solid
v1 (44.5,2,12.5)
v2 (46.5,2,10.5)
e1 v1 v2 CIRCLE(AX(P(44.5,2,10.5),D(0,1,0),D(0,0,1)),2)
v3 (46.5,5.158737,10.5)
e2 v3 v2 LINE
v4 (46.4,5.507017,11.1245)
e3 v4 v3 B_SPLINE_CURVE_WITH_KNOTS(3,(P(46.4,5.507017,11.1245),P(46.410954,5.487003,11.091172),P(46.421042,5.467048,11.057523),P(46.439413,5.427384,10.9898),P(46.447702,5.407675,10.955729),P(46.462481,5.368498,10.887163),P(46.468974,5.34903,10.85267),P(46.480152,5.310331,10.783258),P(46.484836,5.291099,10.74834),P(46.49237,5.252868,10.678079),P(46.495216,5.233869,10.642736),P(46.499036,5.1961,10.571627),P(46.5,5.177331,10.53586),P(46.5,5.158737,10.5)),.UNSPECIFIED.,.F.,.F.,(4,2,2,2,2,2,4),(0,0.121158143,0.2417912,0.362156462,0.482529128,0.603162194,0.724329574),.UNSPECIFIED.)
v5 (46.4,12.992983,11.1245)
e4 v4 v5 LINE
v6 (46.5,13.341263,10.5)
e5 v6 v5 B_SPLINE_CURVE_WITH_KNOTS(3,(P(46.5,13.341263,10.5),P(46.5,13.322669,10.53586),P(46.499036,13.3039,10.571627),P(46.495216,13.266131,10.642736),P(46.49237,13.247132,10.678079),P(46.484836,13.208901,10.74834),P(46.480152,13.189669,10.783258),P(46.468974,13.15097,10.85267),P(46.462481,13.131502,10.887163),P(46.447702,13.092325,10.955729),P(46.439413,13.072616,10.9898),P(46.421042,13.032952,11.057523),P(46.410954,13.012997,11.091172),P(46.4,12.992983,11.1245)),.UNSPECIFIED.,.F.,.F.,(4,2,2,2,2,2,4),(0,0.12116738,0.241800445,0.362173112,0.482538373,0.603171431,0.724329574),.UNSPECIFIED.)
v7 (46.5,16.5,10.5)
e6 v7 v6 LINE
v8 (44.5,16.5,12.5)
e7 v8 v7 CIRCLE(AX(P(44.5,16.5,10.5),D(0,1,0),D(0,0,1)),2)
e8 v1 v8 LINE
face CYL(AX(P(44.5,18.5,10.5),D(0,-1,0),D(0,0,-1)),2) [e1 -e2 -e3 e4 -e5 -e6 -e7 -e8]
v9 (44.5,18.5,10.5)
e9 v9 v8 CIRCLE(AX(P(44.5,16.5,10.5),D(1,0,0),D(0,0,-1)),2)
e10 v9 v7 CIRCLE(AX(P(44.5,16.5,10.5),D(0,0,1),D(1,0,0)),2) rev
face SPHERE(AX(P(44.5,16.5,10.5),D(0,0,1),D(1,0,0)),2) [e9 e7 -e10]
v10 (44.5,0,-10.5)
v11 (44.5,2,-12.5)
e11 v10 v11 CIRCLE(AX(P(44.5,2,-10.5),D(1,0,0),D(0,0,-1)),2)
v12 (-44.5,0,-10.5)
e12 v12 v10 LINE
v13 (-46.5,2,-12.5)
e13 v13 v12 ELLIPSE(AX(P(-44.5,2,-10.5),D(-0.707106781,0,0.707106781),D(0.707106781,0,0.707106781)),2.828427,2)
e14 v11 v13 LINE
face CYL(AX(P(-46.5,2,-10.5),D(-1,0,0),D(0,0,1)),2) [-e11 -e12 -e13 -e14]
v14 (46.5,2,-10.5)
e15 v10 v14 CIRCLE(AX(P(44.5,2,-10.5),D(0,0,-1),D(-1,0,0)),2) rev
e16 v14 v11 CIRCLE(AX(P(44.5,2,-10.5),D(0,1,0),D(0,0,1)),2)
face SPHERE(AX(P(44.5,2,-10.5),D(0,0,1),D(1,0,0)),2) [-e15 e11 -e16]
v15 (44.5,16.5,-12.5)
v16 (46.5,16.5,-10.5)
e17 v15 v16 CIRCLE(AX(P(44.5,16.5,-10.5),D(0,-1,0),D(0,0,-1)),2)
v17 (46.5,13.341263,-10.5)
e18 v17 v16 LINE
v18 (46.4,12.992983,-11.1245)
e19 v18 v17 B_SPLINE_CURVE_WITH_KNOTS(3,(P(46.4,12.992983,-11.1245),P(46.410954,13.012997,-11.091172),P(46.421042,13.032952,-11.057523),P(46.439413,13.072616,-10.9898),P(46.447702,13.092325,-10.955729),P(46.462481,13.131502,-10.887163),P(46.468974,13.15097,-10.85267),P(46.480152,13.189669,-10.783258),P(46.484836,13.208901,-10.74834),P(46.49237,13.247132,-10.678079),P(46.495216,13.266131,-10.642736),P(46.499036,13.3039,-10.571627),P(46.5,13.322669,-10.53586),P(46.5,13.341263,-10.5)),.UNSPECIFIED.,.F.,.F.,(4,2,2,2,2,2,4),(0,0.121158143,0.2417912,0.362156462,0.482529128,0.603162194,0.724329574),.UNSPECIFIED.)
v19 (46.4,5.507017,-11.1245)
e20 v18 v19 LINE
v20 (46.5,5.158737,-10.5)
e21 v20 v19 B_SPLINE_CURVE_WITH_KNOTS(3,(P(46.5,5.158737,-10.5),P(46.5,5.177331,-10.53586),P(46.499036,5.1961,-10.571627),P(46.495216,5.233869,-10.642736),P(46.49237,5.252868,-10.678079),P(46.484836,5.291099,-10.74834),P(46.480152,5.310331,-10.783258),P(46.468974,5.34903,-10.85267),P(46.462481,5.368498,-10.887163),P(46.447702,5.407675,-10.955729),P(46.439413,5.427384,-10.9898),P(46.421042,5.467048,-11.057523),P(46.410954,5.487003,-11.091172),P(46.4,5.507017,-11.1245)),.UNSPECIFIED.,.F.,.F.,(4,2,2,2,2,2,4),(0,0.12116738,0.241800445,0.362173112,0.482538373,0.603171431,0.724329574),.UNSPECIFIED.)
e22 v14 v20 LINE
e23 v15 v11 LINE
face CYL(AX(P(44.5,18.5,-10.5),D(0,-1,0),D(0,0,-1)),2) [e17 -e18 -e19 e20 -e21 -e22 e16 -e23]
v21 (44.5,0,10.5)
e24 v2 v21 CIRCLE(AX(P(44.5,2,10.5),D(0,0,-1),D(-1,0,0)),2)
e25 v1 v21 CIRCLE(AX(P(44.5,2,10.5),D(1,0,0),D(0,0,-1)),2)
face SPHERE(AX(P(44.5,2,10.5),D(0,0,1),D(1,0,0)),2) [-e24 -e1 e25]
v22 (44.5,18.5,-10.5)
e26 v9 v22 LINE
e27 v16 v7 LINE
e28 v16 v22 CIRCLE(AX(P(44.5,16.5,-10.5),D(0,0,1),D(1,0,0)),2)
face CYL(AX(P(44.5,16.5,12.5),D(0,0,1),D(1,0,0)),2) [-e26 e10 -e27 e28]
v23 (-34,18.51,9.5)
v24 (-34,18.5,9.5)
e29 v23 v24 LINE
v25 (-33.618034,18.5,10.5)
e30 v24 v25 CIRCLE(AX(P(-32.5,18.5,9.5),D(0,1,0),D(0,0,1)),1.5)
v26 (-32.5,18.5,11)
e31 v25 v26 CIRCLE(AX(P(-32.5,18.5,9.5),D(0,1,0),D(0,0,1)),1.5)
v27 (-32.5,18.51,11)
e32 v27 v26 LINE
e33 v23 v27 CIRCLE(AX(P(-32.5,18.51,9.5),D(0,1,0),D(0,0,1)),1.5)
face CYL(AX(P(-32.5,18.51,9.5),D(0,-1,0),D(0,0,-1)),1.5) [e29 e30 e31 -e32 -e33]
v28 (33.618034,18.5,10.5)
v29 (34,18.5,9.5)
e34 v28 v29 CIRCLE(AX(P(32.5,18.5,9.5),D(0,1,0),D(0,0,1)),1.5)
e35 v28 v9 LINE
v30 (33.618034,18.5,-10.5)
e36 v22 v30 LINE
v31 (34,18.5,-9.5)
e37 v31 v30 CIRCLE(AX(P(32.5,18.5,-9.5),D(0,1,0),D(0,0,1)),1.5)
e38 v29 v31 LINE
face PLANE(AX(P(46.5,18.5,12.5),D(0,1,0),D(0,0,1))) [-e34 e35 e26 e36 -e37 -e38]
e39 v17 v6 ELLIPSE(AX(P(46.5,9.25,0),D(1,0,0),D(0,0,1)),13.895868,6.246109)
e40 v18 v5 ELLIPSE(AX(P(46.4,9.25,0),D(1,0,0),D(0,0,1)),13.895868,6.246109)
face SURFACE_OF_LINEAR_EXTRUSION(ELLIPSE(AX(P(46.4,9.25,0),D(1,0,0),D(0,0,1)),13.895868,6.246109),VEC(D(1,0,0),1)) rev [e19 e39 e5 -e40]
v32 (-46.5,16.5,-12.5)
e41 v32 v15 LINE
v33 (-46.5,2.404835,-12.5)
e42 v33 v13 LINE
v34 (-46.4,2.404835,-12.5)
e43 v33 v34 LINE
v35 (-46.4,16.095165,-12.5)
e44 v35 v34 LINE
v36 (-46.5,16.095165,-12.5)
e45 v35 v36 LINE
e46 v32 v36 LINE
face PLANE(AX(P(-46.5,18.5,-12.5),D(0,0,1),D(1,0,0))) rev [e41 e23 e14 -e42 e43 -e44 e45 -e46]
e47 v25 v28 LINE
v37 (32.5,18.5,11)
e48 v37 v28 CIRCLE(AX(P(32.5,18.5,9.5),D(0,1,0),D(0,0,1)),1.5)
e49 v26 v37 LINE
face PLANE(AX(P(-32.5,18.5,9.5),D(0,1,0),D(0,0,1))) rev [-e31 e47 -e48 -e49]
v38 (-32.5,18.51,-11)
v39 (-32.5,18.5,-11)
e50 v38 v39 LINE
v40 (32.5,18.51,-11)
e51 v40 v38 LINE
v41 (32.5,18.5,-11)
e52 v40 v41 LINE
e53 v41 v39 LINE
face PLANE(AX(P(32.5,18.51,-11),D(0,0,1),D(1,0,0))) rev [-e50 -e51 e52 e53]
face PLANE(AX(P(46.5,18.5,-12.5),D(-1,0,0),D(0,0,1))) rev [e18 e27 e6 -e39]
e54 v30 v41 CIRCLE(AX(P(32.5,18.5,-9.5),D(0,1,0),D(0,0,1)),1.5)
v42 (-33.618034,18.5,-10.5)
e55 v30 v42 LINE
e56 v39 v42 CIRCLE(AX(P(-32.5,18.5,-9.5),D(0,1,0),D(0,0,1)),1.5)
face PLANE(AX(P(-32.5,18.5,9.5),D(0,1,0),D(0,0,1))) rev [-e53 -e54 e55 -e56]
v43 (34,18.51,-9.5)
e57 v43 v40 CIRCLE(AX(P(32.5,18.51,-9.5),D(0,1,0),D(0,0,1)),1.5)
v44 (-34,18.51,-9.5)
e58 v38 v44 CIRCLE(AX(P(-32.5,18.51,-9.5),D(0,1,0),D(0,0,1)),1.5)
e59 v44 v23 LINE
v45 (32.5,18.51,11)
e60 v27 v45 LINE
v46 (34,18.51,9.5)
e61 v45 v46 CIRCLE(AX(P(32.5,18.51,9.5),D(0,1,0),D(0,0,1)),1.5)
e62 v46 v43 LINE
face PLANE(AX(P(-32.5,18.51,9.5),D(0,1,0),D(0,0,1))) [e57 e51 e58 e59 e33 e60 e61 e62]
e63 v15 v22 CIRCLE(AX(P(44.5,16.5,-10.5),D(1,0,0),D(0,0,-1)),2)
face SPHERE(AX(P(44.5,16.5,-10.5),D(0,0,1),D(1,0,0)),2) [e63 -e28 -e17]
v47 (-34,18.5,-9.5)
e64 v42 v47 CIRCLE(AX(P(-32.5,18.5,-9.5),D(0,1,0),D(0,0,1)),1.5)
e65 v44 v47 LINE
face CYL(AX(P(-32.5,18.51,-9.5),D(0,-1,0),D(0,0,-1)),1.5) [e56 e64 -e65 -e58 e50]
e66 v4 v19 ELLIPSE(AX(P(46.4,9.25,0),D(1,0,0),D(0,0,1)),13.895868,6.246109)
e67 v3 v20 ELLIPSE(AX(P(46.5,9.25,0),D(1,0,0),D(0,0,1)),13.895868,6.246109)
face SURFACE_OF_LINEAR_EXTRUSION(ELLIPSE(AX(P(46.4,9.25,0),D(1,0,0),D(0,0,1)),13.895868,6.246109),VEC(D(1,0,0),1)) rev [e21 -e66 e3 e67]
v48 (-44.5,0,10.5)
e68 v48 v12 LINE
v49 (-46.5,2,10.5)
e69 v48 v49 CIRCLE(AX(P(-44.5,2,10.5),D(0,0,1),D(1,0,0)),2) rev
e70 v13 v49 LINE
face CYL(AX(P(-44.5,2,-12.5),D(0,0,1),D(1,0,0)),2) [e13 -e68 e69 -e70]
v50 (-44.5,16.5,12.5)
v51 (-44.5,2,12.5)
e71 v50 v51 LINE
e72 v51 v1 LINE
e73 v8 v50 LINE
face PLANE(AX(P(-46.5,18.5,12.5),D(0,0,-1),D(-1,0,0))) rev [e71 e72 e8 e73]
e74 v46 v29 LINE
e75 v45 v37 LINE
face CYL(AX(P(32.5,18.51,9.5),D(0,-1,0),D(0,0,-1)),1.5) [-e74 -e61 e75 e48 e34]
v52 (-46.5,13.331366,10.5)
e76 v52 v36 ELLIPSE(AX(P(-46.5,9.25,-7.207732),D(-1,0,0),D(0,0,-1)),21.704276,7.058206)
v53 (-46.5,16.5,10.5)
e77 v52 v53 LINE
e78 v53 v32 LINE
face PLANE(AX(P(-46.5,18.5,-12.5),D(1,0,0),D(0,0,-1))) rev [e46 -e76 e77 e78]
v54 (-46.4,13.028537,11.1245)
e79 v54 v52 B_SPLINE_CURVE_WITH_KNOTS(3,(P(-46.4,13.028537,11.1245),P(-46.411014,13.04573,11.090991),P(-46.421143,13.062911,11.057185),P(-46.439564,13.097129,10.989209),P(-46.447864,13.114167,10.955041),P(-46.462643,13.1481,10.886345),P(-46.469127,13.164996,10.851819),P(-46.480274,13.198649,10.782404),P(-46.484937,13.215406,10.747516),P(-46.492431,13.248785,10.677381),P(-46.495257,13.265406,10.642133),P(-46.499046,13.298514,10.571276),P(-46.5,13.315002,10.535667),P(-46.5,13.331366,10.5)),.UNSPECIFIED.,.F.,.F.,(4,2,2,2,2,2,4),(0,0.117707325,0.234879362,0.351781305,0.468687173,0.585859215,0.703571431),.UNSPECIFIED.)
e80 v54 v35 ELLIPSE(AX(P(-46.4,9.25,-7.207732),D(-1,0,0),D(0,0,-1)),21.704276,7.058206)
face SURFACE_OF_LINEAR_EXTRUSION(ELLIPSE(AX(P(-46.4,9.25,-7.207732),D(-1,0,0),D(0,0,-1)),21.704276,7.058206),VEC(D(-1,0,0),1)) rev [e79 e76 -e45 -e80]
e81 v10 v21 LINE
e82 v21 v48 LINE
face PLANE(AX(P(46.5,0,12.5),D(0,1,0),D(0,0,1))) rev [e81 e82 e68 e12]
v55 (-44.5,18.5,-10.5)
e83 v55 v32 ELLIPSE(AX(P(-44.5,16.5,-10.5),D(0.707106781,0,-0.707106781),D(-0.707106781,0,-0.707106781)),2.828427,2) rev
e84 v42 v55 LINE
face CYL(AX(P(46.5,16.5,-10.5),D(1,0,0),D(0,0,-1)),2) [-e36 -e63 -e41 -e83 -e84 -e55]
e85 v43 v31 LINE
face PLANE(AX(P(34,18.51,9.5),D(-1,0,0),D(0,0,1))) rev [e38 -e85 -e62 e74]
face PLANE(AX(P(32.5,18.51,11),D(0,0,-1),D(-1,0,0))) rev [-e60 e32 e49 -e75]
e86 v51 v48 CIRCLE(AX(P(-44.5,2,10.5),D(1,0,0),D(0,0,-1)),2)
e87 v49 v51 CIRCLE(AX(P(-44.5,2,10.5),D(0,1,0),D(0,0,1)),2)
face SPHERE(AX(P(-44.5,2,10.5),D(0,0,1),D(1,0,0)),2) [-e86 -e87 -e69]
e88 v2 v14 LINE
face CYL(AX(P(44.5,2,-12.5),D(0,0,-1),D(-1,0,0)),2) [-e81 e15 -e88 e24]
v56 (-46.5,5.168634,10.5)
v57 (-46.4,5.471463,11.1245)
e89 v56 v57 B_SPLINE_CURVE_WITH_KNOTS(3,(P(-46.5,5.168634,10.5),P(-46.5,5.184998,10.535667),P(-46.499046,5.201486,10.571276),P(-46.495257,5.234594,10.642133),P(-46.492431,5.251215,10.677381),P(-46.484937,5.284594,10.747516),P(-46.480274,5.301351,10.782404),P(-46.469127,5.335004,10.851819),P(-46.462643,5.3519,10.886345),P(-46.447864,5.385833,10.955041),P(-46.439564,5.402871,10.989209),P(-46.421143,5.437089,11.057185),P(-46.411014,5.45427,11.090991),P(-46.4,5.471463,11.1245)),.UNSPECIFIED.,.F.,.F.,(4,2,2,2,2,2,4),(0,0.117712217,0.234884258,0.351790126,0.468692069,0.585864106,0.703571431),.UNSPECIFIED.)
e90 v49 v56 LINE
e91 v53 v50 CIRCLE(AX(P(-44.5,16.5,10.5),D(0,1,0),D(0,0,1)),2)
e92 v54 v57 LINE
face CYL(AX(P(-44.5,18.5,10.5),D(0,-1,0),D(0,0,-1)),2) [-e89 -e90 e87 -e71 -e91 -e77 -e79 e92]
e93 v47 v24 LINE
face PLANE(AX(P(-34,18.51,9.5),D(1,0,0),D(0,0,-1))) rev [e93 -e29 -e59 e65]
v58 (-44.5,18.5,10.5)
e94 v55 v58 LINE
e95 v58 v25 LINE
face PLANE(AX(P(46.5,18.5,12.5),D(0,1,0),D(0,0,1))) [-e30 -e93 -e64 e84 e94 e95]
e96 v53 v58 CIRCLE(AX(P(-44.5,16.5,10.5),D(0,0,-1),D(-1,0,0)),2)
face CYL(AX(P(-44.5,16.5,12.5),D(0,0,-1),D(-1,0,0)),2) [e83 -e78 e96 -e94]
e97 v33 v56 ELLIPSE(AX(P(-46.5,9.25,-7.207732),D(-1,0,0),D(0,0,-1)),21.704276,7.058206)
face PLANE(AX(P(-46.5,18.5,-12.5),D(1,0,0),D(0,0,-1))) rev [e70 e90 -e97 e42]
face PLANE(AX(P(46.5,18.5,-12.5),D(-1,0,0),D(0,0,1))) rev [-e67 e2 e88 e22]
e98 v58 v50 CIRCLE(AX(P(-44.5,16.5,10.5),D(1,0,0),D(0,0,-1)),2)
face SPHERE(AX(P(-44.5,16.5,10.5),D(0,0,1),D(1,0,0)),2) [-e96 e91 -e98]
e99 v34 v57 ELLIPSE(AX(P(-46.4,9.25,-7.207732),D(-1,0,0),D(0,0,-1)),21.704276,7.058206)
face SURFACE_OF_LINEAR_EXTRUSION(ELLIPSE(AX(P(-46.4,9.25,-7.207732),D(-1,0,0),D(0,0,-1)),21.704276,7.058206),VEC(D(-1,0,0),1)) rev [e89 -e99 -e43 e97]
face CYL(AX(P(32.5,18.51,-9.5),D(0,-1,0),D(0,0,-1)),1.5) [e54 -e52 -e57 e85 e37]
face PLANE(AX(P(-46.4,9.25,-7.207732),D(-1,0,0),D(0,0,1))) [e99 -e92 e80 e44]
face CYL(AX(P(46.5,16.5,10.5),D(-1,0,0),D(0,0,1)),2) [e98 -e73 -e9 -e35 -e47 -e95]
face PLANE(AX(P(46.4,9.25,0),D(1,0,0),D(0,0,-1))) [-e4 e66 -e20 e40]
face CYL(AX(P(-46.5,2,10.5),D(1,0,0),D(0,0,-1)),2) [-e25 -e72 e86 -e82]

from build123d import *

# Parameters (mm, degrees)
SKETCH1_W           = 93
SKETCH1_H           = 25
BOSS_EXTRUDE1_DEPTH = 18.5
FILLET1_R           = 2
FILLET2_R           = 2
BOSS_EXTRUDE2_DEPTH = 0.01
SKETCH4_RX          = 13.895867653
SKETCH4_RY          = 6.24610939
CUT_EXTRUDE1_DEPTH  = 0.1
SKETCH5_RX          = 21.704276093
SKETCH5_RY          = 7.058205551
CUT_EXTRUDE2_DEPTH  = 0.1


with BuildPart() as part:
    # Sketch1 → Boss-Extrude1 (new body)
    with BuildSketch(Plane(origin=(0, 0, 0), x_dir=(1, 0, 0), z_dir=(0, 1, 0))):
        Rectangle(SKETCH1_W, SKETCH1_H)
    extrude(amount=BOSS_EXTRUDE1_DEPTH)

    # Fillet1
    fillet1_edges = [part.edges().sort_by_distance(p)[0] for p in [
        (-46.5, 18.5, 0),
        (46.5, 18.5, 0),
        (-46.5, 0, 0),
        (46.5, 0, 0),
    ]]
    fillet(fillet1_edges, radius=FILLET1_R)

    # Fillet2
    # the kernel refuses this fillet: 2 mm, written as the material it takes off along each edge
    with BuildSketch(Plane(origin=(-49.5, 18.5, -12.5), x_dir=(0, -1, 0), z_dir=(1, 0, 0))) as fillet2_piece_1:
        with BuildLine():
            CenterArc((FILLET2_R, -FILLET2_R), FILLET2_R, 90, 90)
            Line((0, -FILLET2_R), (0, 0))
            Line((0, 0), (FILLET2_R, 0))
        make_face()
    extrude(amount=94, mode=Mode.SUBTRACT)
    with BuildSketch(Plane(origin=(44.5, 18.5, 12.5), x_dir=(0, 0, -1), z_dir=(-1, 0, 0))) as fillet2_piece_2:
        with BuildLine():
            CenterArc((FILLET2_R, FILLET2_R), FILLET2_R, 180, 90)
            Line((0, FILLET2_R), (0, 0))
            Line((0, 0), (FILLET2_R, 0))
        make_face()
    extrude(amount=89, mode=Mode.SUBTRACT)
    with BuildSketch(Plane(origin=(44.5, 0, 12.5), x_dir=(0, 0, -1), z_dir=(-1, 0, 0))) as fillet2_piece_3:
        with BuildLine():
            CenterArc((FILLET2_R, -FILLET2_R), FILLET2_R, 90, 90)
            Line((0, -FILLET2_R), (0, 0))
            Line((0, 0), (FILLET2_R, 0))
        make_face()
    extrude(amount=89, mode=Mode.SUBTRACT)
    with BuildSketch(Plane(origin=(46.5, 2, 12.5), x_dir=(0, 0, -1), z_dir=(0, 1, 0)), Plane(origin=(46.5, 2, -12.5), x_dir=(-1, 0, 0), z_dir=(0, 1, 0))) as fillet2_piece_4:
        with BuildLine():
            CenterArc((FILLET2_R, FILLET2_R), FILLET2_R, 180, 90)
            Line((0, FILLET2_R), (0, 0))
            Line((0, 0), (FILLET2_R, 0))
        make_face()
    extrude(amount=14.5, mode=Mode.SUBTRACT)
    with BuildSketch(Plane(origin=(-46.5, 2, 12.5), x_dir=(0, 0, -1), z_dir=(0, 1, 0))) as fillet2_piece_5:
        with BuildLine():
            CenterArc((FILLET2_R, -FILLET2_R), FILLET2_R, 90, 90)
            Line((0, -FILLET2_R), (0, 0))
            Line((0, 0), (FILLET2_R, 0))
        make_face()
    extrude(amount=14.5, mode=Mode.SUBTRACT)
    with BuildSketch(Plane(origin=(44.5, 16.5, 12.5), x_dir=(1, 0, 0), z_dir=(0, -1, 0))) as fillet2_piece_6:
        with BuildLine():
            CenterArc((2 - FILLET2_R, -FILLET2_R), FILLET2_R, 0, 90)
            Line((2 - FILLET2_R, 0), (2, 0))
            Line((2, 0), (2, -FILLET2_R))
        make_face()
    revolve(axis=Axis((44.5, 16.5, 12.5), (0, 0, 1)), revolution_arc=90, mode=Mode.SUBTRACT)
    with BuildSketch(Plane(origin=(44.5, 2, 12.5), x_dir=(1, 0, 0), z_dir=(0, 1, 0))) as fillet2_piece_7:
        with BuildLine():
            CenterArc((2 - FILLET2_R, FILLET2_R), FILLET2_R, 270, 90)
            Line((2 - FILLET2_R, 0), (2, 0))
            Line((2, 0), (2, FILLET2_R))
        make_face()
    revolve(axis=Axis((44.5, 2, 12.5), (0, 0, -1)), revolution_arc=90, mode=Mode.SUBTRACT)
    with BuildSketch(Plane(origin=(-44.5, 2, 12.5), x_dir=(-1, 0, 0), z_dir=(0, 1, 0))) as fillet2_piece_8:
        with BuildLine():
            CenterArc((2 - FILLET2_R, -FILLET2_R), FILLET2_R, 0, 90)
            Line((2 - FILLET2_R, 0), (2, 0))
            Line((2, 0), (2, -FILLET2_R))
        make_face()
    revolve(axis=Axis((-44.5, 2, 12.5), (0, 0, 1)), revolution_arc=90, mode=Mode.SUBTRACT)
    with BuildSketch(Plane(origin=(-44.5, 16.5, 12.5), x_dir=(-1, 0, 0), z_dir=(0, -1, 0))) as fillet2_piece_9:
        with BuildLine():
            CenterArc((2 - FILLET2_R, FILLET2_R), FILLET2_R, 270, 90)
            Line((2 - FILLET2_R, 0), (2, 0))
            Line((2, 0), (2, FILLET2_R))
        make_face()
    revolve(axis=Axis((-44.5, 16.5, 12.5), (0, 0, -1)), revolution_arc=90, mode=Mode.SUBTRACT)
    with BuildSketch(Plane(origin=(-49.5, 0, -12.5), x_dir=(0, 1, 0), z_dir=(1, 0, 0))) as fillet2_piece_10:
        with BuildLine():
            CenterArc((FILLET2_R, FILLET2_R), FILLET2_R, 180, 90)
            Line((0, FILLET2_R), (0, 0))
            Line((0, 0), (FILLET2_R, 0))
        make_face()
    extrude(amount=94, mode=Mode.SUBTRACT)
    with BuildSketch(Plane(origin=(44.5, 16.5, -12.5), x_dir=(1, 0, 0), z_dir=(0, -1, 0))) as fillet2_piece_11:
        with BuildLine():
            CenterArc((2 - FILLET2_R, FILLET2_R), FILLET2_R, 270, 90)
            Line((2, FILLET2_R), (2, 0))
            Line((2, 0), (2 - FILLET2_R, 0))
        make_face()
    revolve(axis=Axis((44.5, 16.5, -12.5), (0, 0, 1)), revolution_arc=90, mode=Mode.SUBTRACT)
    with BuildSketch(Plane(origin=(44.5, 2, -12.5), x_dir=(1, 0, 0), z_dir=(0, 1, 0))) as fillet2_piece_12:
        with BuildLine():
            CenterArc((2 - FILLET2_R, -FILLET2_R), FILLET2_R, 0, 90)
            Line((2, -FILLET2_R), (2, 0))
            Line((2, 0), (2 - FILLET2_R, 0))
        make_face()
    revolve(axis=Axis((44.5, 2, -12.5), (0, 0, -1)), revolution_arc=90, mode=Mode.SUBTRACT)

    # Sketch3 → Boss-Extrude2 (add)
    with BuildSketch(Plane(origin=(0, 18.5, 0), x_dir=(-1, 0, 0), z_dir=(0, 1, 0))):
        with BuildLine():
            Line((-32.5, 11), (32.5, 11))
            ThreePointArc((32.5, 11), (33.560660172, 10.560660172), (34, 9.5))
            Line((34, 9.5), (34, -9.5))
            ThreePointArc((34, -9.5), (33.560660172, -10.560660172), (32.5, -11))
            Line((32.5, -11), (-32.5, -11))
            ThreePointArc((-32.5, -11), (-33.560660172, -10.560660172), (-34, -9.5))
            Line((-34, -9.5), (-34, 9.5))
            ThreePointArc((-34, 9.5), (-33.560660172, 10.560660172), (-32.5, 11))
        make_face()
    extrude(amount=BOSS_EXTRUDE2_DEPTH)

    # Sketch4 → Cut-Extrude1 (cut)
    with BuildSketch(Plane(origin=(46.5, 0, 0), x_dir=(0, 0, -1), z_dir=(1, 0, 0))):
        with Locations(Location((0, 9.25), (0, 0, 180))):
            Ellipse(SKETCH4_RX, SKETCH4_RY)
    extrude(amount=-CUT_EXTRUDE1_DEPTH, mode=Mode.SUBTRACT)

    # Sketch5 → Cut-Extrude2 (cut)
    with BuildSketch(Plane.ZY.offset(46.5)):
        with Locations(Location((-7.207732319, 9.25), (0, 0, 180))):
            Ellipse(SKETCH5_RX, SKETCH5_RY)
    extrude(amount=-CUT_EXTRUDE2_DEPTH, mode=Mode.SUBTRACT)


solid = part.part
